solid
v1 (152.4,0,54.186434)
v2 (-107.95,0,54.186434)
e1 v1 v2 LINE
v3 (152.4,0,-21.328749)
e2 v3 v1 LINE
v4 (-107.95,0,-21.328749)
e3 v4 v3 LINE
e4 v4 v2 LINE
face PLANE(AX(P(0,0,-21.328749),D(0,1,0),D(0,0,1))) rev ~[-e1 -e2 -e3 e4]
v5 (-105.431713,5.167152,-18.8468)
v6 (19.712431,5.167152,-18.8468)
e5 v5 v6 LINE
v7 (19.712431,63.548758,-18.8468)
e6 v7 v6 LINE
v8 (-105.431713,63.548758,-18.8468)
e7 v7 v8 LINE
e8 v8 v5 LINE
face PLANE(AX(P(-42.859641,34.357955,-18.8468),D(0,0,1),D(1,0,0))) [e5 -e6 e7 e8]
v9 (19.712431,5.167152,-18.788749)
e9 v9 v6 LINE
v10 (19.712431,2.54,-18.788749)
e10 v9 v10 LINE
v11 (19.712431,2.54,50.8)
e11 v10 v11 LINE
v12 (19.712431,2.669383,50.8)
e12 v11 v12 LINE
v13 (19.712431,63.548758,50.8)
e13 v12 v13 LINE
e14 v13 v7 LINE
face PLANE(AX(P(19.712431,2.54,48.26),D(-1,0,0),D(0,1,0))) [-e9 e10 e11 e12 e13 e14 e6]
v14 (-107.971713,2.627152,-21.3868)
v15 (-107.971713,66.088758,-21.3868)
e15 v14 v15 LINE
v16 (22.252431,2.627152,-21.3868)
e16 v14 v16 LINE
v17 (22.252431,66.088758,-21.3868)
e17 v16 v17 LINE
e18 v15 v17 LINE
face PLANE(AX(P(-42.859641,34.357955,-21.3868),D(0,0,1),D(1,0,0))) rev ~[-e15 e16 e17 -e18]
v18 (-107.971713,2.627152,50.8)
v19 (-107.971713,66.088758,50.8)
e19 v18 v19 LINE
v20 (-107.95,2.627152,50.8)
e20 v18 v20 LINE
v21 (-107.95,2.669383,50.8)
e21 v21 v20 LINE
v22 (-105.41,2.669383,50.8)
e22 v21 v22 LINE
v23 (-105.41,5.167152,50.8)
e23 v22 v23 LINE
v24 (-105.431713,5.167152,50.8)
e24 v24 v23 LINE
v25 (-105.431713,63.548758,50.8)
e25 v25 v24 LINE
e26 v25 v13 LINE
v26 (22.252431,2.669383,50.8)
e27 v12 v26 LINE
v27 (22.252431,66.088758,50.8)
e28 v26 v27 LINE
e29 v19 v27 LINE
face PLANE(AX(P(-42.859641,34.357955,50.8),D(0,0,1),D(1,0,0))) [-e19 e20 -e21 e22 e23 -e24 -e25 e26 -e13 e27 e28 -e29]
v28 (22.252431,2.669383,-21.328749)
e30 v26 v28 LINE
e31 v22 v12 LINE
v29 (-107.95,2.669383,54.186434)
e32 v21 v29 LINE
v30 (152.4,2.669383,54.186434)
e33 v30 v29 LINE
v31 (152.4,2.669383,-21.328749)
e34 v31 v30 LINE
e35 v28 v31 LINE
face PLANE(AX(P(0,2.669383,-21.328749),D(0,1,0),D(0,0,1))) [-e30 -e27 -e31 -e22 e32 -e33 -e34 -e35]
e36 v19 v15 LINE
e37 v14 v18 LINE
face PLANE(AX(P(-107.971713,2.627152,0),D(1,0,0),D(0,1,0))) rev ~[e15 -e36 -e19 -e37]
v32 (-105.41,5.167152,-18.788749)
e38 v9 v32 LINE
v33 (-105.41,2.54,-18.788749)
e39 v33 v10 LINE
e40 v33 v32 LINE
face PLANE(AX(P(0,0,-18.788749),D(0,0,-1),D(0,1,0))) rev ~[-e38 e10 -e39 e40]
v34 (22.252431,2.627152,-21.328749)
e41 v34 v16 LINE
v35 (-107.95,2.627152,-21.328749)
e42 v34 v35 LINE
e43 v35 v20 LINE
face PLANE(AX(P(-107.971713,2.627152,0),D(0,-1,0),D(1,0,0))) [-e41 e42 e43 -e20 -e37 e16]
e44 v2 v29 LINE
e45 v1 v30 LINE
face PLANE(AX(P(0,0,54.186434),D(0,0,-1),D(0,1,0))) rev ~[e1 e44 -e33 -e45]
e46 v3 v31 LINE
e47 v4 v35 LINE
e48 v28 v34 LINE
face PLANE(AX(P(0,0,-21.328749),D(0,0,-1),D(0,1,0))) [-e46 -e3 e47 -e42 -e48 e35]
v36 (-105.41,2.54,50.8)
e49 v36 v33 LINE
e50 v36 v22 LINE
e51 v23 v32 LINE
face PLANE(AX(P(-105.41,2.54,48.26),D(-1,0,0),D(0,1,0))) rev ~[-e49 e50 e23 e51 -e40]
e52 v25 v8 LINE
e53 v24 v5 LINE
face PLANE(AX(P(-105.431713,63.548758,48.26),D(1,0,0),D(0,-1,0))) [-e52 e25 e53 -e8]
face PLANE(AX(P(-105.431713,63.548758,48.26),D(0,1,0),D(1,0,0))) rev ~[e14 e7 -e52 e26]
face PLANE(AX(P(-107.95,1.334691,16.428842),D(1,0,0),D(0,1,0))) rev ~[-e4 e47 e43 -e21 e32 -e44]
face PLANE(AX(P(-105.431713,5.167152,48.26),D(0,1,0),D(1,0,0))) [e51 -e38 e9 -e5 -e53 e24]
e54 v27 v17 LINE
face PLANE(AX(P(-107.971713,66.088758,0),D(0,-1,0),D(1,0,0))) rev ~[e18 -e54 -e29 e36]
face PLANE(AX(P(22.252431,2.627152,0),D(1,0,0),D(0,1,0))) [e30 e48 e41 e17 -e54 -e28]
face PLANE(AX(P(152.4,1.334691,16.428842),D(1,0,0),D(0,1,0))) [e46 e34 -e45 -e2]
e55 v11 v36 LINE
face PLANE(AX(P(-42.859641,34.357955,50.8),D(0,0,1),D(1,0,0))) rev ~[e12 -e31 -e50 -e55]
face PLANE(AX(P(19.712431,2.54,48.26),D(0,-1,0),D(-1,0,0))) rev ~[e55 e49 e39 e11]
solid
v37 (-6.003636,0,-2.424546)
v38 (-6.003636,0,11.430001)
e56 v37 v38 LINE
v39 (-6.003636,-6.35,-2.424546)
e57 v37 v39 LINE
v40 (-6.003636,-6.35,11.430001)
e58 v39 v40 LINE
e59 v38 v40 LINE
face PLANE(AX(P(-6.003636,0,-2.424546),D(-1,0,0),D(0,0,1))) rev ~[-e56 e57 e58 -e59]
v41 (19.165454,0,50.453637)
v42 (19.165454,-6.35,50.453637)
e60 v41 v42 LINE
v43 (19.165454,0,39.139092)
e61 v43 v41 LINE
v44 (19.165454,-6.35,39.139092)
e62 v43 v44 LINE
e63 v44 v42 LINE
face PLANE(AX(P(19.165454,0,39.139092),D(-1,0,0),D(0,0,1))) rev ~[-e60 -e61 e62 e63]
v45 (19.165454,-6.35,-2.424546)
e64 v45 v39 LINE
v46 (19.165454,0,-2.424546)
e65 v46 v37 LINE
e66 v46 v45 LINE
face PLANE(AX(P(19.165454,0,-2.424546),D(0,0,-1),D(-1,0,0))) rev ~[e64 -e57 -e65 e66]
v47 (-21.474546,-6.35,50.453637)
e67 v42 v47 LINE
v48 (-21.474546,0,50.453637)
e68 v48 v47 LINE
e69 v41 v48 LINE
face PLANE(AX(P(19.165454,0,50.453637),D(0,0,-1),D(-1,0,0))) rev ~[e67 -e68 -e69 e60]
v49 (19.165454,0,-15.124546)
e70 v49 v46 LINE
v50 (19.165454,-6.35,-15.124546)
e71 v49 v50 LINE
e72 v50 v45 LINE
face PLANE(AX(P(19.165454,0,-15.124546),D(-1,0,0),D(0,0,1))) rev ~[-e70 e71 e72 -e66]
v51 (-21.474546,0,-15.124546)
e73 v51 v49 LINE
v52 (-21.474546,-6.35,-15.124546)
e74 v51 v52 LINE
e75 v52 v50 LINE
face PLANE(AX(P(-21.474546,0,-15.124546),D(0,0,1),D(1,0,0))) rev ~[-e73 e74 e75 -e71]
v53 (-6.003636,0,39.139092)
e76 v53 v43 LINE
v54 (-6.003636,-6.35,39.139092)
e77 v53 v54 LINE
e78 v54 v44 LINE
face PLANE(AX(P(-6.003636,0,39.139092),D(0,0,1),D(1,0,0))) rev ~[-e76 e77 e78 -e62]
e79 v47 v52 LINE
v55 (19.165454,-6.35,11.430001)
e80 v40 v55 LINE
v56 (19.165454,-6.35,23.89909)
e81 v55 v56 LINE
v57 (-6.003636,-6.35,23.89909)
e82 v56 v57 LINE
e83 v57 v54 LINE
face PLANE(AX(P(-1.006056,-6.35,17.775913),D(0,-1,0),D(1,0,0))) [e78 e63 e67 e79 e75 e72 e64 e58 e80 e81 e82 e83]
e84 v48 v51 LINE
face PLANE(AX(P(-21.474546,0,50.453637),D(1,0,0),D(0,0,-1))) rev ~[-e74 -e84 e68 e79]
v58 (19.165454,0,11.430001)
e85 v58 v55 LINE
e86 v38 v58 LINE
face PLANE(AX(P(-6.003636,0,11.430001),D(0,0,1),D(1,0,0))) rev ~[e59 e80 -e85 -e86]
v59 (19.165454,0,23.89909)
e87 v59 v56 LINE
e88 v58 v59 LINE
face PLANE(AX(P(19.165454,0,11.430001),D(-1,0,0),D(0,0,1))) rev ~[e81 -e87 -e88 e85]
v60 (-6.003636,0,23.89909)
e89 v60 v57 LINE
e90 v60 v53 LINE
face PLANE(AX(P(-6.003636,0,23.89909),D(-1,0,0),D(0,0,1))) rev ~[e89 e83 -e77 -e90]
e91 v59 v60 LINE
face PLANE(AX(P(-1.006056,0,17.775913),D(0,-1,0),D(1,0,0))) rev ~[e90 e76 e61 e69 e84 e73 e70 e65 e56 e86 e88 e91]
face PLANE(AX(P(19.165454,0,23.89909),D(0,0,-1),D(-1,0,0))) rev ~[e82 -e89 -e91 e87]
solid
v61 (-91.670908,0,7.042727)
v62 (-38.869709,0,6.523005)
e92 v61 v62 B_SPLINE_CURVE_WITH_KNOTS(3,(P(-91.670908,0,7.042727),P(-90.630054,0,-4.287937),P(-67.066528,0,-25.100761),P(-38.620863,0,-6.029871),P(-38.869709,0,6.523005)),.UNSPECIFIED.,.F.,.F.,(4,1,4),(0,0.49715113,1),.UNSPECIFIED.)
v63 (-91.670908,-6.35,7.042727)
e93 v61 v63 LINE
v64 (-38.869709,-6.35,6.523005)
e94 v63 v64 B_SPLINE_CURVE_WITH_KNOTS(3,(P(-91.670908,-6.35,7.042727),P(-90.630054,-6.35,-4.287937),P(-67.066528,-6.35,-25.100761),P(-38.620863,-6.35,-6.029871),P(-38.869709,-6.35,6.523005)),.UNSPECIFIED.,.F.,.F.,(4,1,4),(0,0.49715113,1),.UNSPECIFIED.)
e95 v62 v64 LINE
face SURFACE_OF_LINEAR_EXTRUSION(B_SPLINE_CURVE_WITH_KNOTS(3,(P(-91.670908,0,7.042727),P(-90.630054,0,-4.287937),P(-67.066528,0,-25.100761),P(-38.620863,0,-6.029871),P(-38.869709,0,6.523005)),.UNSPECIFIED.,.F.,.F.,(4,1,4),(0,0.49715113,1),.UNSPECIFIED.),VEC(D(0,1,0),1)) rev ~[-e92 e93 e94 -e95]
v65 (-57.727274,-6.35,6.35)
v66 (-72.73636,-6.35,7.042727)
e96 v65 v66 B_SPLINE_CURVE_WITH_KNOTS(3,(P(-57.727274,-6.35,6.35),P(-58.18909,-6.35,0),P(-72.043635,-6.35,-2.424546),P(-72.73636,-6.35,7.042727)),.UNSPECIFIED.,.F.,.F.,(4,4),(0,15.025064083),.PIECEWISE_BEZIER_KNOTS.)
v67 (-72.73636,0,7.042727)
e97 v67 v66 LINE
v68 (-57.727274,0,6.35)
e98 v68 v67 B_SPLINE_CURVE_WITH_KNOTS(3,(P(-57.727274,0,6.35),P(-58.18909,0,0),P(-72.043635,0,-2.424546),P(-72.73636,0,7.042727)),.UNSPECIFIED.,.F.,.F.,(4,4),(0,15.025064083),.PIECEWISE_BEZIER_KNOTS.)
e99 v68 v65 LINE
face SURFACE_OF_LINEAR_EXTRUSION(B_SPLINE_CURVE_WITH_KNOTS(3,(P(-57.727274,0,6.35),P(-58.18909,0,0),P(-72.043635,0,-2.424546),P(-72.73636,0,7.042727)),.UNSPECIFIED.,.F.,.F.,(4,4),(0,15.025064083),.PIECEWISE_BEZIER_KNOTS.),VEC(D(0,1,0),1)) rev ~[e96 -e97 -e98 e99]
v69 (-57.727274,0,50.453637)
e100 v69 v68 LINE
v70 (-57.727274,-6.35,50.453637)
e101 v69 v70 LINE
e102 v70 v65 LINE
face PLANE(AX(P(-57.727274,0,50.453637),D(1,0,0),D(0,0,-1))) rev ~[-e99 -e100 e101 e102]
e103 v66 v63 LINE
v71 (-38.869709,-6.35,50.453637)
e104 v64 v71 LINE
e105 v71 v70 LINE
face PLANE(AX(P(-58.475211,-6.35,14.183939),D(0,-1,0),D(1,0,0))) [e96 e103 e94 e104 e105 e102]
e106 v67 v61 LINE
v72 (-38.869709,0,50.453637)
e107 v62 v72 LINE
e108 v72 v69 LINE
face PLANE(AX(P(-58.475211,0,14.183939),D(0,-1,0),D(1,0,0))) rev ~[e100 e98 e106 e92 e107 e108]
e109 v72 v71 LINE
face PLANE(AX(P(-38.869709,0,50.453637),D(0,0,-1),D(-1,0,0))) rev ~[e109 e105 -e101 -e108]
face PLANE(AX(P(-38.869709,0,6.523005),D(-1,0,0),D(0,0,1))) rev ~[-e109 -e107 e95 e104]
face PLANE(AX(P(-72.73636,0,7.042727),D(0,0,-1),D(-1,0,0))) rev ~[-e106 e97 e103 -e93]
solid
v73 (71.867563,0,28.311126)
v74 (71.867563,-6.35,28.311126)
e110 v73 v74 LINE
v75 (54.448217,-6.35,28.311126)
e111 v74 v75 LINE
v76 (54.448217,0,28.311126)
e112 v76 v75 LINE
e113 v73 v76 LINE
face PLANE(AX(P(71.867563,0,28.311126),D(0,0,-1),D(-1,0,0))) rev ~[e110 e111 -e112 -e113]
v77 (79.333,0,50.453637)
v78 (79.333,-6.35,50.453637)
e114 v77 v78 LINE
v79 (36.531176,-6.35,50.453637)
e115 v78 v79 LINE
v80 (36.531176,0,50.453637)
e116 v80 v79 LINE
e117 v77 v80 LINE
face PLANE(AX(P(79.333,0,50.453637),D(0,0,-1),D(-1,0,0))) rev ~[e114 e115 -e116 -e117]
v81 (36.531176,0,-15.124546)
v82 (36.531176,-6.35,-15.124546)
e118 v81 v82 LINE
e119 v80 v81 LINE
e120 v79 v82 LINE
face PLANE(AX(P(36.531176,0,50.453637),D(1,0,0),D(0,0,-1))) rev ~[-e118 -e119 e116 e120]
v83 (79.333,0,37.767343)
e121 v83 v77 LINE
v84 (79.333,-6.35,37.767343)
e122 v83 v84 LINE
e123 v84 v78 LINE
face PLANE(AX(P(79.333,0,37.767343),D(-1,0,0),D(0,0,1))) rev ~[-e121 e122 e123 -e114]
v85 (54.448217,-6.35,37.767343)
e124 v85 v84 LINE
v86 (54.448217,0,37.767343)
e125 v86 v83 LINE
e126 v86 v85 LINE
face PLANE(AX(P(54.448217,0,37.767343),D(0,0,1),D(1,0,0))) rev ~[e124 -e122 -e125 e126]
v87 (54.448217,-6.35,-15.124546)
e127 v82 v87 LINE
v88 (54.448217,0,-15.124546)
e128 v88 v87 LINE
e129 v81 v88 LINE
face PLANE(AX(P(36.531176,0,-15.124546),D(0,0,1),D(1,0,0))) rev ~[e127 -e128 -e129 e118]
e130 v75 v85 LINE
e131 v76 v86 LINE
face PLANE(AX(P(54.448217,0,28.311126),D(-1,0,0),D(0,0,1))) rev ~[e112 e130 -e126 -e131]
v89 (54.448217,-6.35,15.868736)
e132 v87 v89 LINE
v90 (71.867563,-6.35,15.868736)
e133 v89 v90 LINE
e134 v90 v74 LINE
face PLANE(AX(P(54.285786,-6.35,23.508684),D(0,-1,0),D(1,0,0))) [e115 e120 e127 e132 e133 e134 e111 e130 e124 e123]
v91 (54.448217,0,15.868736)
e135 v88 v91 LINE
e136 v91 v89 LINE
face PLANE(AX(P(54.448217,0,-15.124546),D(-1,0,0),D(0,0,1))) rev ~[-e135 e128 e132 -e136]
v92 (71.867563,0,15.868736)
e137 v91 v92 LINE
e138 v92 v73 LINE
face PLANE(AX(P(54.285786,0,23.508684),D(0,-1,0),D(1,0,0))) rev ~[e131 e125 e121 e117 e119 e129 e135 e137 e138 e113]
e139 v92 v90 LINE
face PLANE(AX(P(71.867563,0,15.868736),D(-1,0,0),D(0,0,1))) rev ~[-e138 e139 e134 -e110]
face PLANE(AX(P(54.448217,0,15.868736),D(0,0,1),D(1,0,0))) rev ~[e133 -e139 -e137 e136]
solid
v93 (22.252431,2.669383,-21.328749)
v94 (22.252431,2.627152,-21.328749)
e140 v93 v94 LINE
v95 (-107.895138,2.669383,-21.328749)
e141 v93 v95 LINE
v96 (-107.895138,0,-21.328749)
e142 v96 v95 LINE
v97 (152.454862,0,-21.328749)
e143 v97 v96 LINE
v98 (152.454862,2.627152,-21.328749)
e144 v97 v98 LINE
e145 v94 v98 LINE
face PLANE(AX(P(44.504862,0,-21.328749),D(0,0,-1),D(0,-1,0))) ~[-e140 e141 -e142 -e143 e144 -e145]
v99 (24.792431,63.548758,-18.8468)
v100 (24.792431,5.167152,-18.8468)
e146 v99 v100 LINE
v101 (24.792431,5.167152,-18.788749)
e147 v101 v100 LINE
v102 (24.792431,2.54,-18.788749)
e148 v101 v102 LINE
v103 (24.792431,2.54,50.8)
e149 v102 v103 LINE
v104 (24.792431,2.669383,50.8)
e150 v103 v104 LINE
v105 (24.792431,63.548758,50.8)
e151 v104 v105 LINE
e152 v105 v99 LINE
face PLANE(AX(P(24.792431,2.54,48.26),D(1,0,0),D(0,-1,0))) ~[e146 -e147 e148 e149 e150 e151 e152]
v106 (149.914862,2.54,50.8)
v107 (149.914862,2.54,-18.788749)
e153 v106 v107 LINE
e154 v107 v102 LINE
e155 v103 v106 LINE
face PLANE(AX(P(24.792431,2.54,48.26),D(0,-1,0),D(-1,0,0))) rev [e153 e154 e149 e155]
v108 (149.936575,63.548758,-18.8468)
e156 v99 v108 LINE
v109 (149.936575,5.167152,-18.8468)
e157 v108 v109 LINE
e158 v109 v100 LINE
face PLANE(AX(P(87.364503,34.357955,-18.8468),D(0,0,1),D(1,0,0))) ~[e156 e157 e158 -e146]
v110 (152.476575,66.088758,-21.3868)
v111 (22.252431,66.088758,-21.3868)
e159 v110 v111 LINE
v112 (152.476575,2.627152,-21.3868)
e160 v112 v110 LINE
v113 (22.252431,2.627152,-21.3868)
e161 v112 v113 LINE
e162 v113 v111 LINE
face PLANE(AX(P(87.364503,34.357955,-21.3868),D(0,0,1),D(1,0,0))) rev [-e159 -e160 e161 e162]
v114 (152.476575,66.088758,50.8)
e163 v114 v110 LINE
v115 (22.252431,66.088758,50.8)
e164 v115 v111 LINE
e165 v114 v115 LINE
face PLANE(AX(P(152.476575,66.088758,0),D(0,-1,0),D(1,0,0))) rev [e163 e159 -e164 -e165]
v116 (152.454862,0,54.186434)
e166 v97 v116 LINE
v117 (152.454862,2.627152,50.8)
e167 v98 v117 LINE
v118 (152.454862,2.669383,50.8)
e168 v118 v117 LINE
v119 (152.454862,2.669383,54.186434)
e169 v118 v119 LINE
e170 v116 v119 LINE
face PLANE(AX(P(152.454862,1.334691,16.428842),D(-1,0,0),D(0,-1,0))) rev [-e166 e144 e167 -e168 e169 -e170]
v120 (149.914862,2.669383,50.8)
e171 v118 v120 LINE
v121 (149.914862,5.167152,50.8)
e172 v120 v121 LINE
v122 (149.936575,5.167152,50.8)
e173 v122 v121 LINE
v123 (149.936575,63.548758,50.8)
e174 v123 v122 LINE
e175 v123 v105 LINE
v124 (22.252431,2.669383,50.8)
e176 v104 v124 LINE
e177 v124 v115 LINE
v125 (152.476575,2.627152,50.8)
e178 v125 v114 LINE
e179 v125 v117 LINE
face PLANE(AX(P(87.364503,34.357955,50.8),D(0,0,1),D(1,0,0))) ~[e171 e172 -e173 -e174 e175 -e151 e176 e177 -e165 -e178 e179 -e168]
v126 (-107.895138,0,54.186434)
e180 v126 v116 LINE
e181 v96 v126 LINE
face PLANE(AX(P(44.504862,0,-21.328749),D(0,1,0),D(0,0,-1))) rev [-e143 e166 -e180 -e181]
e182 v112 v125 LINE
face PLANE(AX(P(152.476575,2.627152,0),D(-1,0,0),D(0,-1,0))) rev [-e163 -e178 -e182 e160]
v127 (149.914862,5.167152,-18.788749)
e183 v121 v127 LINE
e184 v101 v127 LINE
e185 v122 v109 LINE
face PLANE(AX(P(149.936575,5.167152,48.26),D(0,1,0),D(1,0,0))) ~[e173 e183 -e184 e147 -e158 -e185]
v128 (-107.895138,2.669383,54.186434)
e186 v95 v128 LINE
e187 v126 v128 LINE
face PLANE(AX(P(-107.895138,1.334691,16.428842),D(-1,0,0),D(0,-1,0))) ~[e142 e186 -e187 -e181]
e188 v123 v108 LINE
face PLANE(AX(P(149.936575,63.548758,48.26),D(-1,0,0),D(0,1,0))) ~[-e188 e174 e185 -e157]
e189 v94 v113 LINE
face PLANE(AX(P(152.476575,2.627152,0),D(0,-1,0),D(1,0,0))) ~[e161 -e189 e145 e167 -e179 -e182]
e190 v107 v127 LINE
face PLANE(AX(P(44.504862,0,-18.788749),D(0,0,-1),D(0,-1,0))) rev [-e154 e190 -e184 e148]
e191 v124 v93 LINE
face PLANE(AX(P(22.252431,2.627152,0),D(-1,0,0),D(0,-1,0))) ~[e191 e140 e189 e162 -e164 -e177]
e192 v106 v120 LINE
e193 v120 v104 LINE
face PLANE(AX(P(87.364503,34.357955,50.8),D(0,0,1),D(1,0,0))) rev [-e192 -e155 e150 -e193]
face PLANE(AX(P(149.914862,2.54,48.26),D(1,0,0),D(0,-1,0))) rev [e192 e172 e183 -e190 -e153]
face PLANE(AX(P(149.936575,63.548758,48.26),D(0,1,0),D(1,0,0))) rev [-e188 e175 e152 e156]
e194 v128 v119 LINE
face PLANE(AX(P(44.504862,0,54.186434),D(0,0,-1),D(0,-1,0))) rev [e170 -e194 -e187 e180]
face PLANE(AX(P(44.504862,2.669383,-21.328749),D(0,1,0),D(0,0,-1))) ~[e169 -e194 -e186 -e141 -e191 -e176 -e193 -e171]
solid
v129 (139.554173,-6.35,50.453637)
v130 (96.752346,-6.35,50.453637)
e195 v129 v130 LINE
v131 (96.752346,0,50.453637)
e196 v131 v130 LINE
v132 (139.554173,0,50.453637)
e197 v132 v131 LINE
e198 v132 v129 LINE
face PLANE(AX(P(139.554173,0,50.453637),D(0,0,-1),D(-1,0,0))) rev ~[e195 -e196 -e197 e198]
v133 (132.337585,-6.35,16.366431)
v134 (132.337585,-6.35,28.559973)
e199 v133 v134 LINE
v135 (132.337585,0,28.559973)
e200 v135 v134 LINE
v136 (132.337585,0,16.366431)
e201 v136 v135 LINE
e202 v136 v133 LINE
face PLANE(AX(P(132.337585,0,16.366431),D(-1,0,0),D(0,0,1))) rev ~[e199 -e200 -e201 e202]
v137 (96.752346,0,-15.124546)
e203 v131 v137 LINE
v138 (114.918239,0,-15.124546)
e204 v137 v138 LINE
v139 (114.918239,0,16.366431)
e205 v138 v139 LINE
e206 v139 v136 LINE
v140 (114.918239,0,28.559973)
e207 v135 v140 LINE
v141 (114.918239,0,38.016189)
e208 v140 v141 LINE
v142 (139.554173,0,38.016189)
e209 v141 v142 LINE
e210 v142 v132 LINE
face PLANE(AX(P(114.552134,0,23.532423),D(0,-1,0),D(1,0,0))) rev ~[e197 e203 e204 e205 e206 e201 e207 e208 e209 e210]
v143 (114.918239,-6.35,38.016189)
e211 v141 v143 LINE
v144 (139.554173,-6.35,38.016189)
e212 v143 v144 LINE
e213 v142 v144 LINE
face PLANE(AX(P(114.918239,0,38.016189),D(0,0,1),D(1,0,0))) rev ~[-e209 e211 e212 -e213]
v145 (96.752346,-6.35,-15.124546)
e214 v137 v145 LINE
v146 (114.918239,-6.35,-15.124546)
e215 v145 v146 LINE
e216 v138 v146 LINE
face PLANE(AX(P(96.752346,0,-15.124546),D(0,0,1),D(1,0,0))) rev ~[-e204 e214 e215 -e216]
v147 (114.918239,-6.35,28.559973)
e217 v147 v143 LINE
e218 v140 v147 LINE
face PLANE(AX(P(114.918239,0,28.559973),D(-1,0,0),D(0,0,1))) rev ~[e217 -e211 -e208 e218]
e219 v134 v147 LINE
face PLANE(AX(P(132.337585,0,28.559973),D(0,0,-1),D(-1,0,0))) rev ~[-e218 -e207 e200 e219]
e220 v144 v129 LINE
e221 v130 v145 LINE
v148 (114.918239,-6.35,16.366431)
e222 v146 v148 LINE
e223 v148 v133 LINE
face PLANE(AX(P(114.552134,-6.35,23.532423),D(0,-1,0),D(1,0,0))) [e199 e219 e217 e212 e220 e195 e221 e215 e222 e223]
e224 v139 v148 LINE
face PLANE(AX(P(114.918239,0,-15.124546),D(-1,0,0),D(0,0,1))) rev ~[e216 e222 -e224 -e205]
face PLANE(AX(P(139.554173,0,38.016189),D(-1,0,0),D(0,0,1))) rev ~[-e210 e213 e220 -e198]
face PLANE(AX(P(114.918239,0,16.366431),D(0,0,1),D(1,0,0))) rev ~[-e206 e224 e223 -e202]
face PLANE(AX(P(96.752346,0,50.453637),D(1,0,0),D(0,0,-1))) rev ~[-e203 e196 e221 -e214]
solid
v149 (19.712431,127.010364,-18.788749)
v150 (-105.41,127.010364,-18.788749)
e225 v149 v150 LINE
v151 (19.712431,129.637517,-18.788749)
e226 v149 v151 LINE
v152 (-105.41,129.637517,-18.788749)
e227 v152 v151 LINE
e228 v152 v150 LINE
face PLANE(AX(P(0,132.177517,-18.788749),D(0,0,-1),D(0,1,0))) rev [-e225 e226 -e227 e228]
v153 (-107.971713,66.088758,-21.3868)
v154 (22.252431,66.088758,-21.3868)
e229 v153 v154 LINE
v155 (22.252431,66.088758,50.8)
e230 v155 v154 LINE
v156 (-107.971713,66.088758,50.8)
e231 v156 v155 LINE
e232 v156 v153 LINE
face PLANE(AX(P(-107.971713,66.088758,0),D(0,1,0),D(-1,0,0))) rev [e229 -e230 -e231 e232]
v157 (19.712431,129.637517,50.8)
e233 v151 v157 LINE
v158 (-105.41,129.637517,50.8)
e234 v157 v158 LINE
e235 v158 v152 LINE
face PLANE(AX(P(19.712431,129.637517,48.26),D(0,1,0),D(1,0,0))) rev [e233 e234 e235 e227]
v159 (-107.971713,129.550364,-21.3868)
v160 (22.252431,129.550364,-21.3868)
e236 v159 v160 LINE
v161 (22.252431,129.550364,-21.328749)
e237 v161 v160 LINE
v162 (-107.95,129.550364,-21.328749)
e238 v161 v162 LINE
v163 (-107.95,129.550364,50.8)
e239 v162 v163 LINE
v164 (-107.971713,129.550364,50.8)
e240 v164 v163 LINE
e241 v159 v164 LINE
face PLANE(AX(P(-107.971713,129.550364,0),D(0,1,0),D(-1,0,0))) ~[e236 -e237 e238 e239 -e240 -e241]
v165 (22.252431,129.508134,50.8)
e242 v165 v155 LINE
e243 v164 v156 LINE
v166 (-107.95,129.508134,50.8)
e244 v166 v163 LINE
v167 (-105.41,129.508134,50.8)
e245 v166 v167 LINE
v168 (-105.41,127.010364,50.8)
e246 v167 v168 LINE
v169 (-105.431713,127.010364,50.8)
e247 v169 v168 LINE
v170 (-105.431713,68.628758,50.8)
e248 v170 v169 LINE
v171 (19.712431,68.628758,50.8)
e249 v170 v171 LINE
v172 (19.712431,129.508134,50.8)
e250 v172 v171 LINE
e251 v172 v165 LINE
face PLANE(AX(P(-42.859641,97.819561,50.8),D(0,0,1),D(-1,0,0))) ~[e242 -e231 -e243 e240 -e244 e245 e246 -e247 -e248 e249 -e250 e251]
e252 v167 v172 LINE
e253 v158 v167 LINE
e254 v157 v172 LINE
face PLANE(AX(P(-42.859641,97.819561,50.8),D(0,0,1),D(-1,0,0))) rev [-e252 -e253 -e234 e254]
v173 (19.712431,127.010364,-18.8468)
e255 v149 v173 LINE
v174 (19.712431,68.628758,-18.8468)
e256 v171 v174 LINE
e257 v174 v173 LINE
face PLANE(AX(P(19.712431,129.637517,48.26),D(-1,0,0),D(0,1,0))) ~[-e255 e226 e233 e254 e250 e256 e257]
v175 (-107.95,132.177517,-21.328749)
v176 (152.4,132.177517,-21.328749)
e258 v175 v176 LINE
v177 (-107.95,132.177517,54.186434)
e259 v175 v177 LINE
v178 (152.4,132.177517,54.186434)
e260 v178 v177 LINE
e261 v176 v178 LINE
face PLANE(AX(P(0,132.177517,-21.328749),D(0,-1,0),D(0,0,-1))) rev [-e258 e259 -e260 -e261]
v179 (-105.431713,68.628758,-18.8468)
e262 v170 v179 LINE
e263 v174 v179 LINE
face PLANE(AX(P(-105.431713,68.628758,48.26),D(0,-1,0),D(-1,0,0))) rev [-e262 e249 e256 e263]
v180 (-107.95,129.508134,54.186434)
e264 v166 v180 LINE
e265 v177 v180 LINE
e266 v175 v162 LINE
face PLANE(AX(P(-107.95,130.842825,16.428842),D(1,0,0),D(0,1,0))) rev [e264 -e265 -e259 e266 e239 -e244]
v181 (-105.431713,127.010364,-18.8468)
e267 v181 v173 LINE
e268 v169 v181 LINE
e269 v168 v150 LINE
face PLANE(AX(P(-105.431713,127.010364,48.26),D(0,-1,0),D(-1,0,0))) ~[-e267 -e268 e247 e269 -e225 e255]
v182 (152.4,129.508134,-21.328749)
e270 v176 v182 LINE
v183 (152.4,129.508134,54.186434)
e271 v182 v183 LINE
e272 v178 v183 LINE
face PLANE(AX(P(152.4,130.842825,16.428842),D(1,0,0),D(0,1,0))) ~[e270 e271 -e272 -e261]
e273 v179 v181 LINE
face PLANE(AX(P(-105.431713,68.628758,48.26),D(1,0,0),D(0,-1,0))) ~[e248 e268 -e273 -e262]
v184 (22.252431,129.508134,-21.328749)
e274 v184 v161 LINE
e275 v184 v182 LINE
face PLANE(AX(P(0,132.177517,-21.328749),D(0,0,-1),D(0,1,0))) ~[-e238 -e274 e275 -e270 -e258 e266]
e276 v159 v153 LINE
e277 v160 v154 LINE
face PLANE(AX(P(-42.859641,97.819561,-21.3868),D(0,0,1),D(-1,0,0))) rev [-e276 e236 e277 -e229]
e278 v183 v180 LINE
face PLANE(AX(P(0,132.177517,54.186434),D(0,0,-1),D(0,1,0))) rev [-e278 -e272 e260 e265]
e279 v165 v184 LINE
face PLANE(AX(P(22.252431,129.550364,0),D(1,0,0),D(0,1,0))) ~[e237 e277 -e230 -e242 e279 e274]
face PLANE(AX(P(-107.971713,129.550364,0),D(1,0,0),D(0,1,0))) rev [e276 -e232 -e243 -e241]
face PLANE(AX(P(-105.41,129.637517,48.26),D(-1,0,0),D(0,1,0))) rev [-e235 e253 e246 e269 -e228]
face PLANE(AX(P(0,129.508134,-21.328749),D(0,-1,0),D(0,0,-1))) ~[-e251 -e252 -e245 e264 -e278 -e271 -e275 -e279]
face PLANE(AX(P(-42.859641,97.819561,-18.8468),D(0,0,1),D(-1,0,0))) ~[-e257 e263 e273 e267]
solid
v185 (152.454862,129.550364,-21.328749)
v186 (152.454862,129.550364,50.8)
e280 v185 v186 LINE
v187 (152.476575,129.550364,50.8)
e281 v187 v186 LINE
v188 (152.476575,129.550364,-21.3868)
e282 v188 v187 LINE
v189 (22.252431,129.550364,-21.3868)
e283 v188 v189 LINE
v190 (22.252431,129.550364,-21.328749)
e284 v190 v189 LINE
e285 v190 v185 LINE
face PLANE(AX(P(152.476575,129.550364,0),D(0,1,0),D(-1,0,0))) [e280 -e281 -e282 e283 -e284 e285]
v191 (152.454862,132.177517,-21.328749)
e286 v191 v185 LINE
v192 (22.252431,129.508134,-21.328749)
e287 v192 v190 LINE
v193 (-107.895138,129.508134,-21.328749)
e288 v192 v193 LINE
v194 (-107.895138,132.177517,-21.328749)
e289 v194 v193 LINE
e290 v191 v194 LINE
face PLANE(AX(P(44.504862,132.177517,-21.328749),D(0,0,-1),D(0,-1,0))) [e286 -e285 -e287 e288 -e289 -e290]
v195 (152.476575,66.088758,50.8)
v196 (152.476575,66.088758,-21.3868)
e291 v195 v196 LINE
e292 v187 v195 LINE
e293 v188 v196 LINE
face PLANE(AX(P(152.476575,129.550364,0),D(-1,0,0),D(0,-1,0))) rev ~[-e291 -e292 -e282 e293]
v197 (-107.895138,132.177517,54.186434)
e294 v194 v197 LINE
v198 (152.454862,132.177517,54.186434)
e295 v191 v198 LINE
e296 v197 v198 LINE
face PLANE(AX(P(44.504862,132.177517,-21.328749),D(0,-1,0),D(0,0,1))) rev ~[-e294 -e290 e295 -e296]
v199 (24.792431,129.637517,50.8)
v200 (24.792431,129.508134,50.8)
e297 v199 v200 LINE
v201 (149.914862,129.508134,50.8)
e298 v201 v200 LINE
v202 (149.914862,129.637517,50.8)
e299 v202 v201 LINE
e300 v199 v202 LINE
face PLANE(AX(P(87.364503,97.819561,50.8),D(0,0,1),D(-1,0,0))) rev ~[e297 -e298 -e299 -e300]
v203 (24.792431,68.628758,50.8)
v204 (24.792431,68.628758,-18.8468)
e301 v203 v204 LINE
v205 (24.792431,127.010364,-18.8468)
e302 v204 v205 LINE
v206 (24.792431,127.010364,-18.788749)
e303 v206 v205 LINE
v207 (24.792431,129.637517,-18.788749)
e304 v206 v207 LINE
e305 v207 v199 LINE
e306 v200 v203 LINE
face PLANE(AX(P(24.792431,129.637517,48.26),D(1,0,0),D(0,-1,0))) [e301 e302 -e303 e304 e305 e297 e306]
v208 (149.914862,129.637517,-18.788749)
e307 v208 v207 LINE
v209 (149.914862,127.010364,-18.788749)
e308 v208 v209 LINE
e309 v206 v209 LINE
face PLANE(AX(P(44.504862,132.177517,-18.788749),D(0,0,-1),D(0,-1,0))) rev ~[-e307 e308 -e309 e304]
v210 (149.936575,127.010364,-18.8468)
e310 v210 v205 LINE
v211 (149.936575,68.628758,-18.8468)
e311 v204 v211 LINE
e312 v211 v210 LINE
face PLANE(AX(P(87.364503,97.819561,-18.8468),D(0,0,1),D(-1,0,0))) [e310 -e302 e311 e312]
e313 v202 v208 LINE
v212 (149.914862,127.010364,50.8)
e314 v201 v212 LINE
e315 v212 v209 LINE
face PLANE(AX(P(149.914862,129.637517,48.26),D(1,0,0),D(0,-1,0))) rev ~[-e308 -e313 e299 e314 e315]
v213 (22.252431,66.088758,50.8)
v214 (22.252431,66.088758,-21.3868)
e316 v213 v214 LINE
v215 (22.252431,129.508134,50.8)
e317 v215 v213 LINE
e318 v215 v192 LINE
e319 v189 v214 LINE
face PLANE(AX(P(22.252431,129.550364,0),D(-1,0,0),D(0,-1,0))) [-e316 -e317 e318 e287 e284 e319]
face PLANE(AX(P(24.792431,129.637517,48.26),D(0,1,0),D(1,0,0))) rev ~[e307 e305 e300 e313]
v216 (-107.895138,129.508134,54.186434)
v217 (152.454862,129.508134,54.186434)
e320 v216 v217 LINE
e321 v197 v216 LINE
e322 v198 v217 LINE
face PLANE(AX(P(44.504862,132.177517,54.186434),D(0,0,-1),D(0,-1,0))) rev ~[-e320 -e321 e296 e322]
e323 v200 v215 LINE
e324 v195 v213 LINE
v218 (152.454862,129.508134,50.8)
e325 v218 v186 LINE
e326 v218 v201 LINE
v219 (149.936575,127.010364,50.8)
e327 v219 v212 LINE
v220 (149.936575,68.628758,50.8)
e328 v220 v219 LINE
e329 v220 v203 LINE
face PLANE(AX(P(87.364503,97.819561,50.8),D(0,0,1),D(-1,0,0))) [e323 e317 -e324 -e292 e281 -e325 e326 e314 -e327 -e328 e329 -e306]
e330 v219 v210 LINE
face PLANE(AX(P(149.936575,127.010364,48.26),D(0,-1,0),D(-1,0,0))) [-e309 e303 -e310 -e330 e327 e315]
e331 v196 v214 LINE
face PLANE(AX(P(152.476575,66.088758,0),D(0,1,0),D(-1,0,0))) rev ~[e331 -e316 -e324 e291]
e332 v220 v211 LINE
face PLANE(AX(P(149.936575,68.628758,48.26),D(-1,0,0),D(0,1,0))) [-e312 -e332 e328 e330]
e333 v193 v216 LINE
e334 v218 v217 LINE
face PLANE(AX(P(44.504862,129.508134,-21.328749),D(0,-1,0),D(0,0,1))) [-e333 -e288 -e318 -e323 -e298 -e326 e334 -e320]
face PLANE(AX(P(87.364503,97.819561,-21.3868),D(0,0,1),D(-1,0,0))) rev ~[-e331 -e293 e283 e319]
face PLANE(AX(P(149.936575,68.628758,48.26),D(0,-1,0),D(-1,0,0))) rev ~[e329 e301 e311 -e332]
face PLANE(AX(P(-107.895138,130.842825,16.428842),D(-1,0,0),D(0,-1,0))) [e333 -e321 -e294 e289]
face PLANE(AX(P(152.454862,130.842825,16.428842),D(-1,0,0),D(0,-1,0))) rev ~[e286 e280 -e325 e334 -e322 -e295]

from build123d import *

# Parameters (mm, degrees)
F1_DEPTH      = 6.35
F2_W          = 2.6693828404
F2_H          = 75.5151826888
F3_DEPTH      = 152.4
F3_DEPTH_BACK = 107.95
F4_W          = 130.2241440862
F4_H          = 63.4616059251
F5_DEPTH      = 50.8
F6_DEPTH      = 21.3868
F7_T          = -2.54


# Not quite as in the source:
# - a shell that OpenCascade refuses in one call is made with other operations: the cavity is built on its own and cut out


with BuildPart() as f1:
    # F0 (on Front) → F1 (new body)
    with BuildSketch(Plane.XZ):
        with BuildLine():
            Line((-57.7272735536, 50.4536367953), (-57.7272735536, 49.0681789815))
            Line((-57.7272735536, 49.0681789815), (-57.7272735536, 6.3500003889))
            add(Edge.make_bspline(
                [(-57.7272735536, 6.3500003889), (-58.1890903413, 0), (-72.0436349511, -2.4245455861), (-72.7363601327, 7.0427274331)],
                knots=[0, 0, 0, 0, 15.0250640829, 15.0250640829, 15.0250640829, 15.0250640829], degree=3))
            Line((-72.7363601327, 7.0427274331), (-91.6709080338, 7.0427274331))
            add(Edge.make_bspline(
                [(-91.6709080338, 7.0427274331), (-90.6300544739, -4.2879367247), (-67.0665278584, -25.1007612075), (-38.6208631098, -6.0298712924), (-38.8697087765, 6.5230050582)],
                knots=[0, 0, 0, 0, 0.4971511298, 1, 1, 1, 1], degree=3))
            Line((-38.8697087765, 6.5230050582), (-38.8697087765, 50.4536367953))
            Line((-38.8697087765, 50.4536367953), (-57.7272735536, 50.4536367953))
        make_face()
    extrude(amount=F1_DEPTH)


with BuildPart() as f1b:
    # F0 (on Front) → F1, piece 2 (new body)
    with BuildSketch(Plane.XZ):
        Polygon((-21.4745458215, 50.4536367953), (-21.4745458215, -15.1245463639), (19.1654544324, -15.1245463639), (19.1654544324, -2.4245455861), (-6.0036364011, -2.4245455861), (-6.0036364011, 11.4300008863), (19.1654544324, 11.4300008863), (19.1654544324, 23.899089545), (-6.0036364011, 23.899089545), (-6.0036364011, 39.1390919685), (19.1654544324, 39.1390919685), (19.1654544324, 50.4536367953), align=None)
    extrude(amount=F1_DEPTH)


with BuildPart() as f1c:
    # F0 (on Front) → F1, piece 3 (new body)
    with BuildSketch(Plane.XZ):
        Polygon((36.5311764181, 50.4536367953), (36.5311764181, -15.1245463639), (54.4482171535, -15.1245463639), (54.4482171535, 15.868736431), (71.8675628304, 15.868736431), (71.8675628304, 28.3111259341), (54.4482171535, 28.3111259341), (54.4482171535, 37.7673432231), (79.3329998851, 37.7673432231), (79.3329998851, 50.4536367953), align=None)
    extrude(amount=F1_DEPTH)


with BuildPart() as f1d:
    # F0 (on Front) → F1, piece 4 (new body)
    with BuildSketch(Plane.XZ):
        Polygon((139.5541727543, 50.4536367953), (96.752345562, 50.4536367953), (96.752345562, -15.1245463639), (114.9182394147, -15.1245463639), (114.9182394147, 16.3664314896), (132.3375850916, 16.3664314896), (132.3375850916, 28.5599734634), (114.9182394147, 28.5599734634), (114.9182394147, 38.0161888897), (139.5541727543, 38.0161888897), align=None)
    extrude(amount=F1_DEPTH)


with BuildPart() as f3:
    # F2 (on Right) → F3 (new body, two sides)
    with BuildSketch(Plane.YZ) as f3_sk:
        with Locations((1.3346914202, 16.4288422093)):
            Rectangle(F2_W, F2_H)
    extrude(amount=F3_DEPTH)
    extrude(f3_sk.sketch, amount=-F3_DEPTH_BACK)

    # F4 (on Top) → F5 (join)
    with BuildSketch(Plane.XY):
        with Locations((-42.8596409038, 34.3579554465)):
            Rectangle(F4_W, F4_H)
    extrude(amount=F5_DEPTH)

    # F4 (on Top) → F6 (join)
    with BuildSketch(Plane.XY):
        with Locations((-42.8596409038, 34.3579554465)):
            Rectangle(F4_W, F4_H)
    extrude(amount=-F6_DEPTH)

    # F7: a shell. OpenCascade refuses it in one call, so the cavity is built on its own and cut out:
    # the body offset inwards by the wall thickness, plus a prism from it out through each open face.
    f7_core = offset(f3.part, amount=F7_T, kind=Kind.INTERSECTION, mode=Mode.PRIVATE)
    f7_exits = [f7_core.faces().sort_by_distance(p)[0] for p in [
        (-42.859173, 33.044597, 48.26),
    ]]
    add(f7_core, mode=Mode.SUBTRACT)
    extrude(f7_exits, amount=-F7_T, mode=Mode.SUBTRACT)


with BuildPart() as f8_1:
    # F8: instance of F3
    add(f3.part.mirror(Plane(origin=(22.2524311393, 34.3790536331, 14.7065806878), x_dir=(0, 1, 0), z_dir=(1, 0, 0))))


with BuildPart() as f9_1:
    # F9: instance of F8_1
    add(f8_1.part.mirror(Plane(origin=(87.3645031825, 66.088758409, 14.7066), x_dir=(-1, 0, 0), z_dir=(0, 1, 0))))


with BuildPart() as f9_2:
    # F9: instance of F3
    add(f3.part.mirror(Plane(origin=(87.3645031825, 66.088758409, 14.7066), x_dir=(-1, 0, 0), z_dir=(0, 1, 0))))


solid = Compound([f1.part, f1b.part, f1c.part, f1d.part, f3.part, f8_1.part, f9_1.part, f9_2.part])
